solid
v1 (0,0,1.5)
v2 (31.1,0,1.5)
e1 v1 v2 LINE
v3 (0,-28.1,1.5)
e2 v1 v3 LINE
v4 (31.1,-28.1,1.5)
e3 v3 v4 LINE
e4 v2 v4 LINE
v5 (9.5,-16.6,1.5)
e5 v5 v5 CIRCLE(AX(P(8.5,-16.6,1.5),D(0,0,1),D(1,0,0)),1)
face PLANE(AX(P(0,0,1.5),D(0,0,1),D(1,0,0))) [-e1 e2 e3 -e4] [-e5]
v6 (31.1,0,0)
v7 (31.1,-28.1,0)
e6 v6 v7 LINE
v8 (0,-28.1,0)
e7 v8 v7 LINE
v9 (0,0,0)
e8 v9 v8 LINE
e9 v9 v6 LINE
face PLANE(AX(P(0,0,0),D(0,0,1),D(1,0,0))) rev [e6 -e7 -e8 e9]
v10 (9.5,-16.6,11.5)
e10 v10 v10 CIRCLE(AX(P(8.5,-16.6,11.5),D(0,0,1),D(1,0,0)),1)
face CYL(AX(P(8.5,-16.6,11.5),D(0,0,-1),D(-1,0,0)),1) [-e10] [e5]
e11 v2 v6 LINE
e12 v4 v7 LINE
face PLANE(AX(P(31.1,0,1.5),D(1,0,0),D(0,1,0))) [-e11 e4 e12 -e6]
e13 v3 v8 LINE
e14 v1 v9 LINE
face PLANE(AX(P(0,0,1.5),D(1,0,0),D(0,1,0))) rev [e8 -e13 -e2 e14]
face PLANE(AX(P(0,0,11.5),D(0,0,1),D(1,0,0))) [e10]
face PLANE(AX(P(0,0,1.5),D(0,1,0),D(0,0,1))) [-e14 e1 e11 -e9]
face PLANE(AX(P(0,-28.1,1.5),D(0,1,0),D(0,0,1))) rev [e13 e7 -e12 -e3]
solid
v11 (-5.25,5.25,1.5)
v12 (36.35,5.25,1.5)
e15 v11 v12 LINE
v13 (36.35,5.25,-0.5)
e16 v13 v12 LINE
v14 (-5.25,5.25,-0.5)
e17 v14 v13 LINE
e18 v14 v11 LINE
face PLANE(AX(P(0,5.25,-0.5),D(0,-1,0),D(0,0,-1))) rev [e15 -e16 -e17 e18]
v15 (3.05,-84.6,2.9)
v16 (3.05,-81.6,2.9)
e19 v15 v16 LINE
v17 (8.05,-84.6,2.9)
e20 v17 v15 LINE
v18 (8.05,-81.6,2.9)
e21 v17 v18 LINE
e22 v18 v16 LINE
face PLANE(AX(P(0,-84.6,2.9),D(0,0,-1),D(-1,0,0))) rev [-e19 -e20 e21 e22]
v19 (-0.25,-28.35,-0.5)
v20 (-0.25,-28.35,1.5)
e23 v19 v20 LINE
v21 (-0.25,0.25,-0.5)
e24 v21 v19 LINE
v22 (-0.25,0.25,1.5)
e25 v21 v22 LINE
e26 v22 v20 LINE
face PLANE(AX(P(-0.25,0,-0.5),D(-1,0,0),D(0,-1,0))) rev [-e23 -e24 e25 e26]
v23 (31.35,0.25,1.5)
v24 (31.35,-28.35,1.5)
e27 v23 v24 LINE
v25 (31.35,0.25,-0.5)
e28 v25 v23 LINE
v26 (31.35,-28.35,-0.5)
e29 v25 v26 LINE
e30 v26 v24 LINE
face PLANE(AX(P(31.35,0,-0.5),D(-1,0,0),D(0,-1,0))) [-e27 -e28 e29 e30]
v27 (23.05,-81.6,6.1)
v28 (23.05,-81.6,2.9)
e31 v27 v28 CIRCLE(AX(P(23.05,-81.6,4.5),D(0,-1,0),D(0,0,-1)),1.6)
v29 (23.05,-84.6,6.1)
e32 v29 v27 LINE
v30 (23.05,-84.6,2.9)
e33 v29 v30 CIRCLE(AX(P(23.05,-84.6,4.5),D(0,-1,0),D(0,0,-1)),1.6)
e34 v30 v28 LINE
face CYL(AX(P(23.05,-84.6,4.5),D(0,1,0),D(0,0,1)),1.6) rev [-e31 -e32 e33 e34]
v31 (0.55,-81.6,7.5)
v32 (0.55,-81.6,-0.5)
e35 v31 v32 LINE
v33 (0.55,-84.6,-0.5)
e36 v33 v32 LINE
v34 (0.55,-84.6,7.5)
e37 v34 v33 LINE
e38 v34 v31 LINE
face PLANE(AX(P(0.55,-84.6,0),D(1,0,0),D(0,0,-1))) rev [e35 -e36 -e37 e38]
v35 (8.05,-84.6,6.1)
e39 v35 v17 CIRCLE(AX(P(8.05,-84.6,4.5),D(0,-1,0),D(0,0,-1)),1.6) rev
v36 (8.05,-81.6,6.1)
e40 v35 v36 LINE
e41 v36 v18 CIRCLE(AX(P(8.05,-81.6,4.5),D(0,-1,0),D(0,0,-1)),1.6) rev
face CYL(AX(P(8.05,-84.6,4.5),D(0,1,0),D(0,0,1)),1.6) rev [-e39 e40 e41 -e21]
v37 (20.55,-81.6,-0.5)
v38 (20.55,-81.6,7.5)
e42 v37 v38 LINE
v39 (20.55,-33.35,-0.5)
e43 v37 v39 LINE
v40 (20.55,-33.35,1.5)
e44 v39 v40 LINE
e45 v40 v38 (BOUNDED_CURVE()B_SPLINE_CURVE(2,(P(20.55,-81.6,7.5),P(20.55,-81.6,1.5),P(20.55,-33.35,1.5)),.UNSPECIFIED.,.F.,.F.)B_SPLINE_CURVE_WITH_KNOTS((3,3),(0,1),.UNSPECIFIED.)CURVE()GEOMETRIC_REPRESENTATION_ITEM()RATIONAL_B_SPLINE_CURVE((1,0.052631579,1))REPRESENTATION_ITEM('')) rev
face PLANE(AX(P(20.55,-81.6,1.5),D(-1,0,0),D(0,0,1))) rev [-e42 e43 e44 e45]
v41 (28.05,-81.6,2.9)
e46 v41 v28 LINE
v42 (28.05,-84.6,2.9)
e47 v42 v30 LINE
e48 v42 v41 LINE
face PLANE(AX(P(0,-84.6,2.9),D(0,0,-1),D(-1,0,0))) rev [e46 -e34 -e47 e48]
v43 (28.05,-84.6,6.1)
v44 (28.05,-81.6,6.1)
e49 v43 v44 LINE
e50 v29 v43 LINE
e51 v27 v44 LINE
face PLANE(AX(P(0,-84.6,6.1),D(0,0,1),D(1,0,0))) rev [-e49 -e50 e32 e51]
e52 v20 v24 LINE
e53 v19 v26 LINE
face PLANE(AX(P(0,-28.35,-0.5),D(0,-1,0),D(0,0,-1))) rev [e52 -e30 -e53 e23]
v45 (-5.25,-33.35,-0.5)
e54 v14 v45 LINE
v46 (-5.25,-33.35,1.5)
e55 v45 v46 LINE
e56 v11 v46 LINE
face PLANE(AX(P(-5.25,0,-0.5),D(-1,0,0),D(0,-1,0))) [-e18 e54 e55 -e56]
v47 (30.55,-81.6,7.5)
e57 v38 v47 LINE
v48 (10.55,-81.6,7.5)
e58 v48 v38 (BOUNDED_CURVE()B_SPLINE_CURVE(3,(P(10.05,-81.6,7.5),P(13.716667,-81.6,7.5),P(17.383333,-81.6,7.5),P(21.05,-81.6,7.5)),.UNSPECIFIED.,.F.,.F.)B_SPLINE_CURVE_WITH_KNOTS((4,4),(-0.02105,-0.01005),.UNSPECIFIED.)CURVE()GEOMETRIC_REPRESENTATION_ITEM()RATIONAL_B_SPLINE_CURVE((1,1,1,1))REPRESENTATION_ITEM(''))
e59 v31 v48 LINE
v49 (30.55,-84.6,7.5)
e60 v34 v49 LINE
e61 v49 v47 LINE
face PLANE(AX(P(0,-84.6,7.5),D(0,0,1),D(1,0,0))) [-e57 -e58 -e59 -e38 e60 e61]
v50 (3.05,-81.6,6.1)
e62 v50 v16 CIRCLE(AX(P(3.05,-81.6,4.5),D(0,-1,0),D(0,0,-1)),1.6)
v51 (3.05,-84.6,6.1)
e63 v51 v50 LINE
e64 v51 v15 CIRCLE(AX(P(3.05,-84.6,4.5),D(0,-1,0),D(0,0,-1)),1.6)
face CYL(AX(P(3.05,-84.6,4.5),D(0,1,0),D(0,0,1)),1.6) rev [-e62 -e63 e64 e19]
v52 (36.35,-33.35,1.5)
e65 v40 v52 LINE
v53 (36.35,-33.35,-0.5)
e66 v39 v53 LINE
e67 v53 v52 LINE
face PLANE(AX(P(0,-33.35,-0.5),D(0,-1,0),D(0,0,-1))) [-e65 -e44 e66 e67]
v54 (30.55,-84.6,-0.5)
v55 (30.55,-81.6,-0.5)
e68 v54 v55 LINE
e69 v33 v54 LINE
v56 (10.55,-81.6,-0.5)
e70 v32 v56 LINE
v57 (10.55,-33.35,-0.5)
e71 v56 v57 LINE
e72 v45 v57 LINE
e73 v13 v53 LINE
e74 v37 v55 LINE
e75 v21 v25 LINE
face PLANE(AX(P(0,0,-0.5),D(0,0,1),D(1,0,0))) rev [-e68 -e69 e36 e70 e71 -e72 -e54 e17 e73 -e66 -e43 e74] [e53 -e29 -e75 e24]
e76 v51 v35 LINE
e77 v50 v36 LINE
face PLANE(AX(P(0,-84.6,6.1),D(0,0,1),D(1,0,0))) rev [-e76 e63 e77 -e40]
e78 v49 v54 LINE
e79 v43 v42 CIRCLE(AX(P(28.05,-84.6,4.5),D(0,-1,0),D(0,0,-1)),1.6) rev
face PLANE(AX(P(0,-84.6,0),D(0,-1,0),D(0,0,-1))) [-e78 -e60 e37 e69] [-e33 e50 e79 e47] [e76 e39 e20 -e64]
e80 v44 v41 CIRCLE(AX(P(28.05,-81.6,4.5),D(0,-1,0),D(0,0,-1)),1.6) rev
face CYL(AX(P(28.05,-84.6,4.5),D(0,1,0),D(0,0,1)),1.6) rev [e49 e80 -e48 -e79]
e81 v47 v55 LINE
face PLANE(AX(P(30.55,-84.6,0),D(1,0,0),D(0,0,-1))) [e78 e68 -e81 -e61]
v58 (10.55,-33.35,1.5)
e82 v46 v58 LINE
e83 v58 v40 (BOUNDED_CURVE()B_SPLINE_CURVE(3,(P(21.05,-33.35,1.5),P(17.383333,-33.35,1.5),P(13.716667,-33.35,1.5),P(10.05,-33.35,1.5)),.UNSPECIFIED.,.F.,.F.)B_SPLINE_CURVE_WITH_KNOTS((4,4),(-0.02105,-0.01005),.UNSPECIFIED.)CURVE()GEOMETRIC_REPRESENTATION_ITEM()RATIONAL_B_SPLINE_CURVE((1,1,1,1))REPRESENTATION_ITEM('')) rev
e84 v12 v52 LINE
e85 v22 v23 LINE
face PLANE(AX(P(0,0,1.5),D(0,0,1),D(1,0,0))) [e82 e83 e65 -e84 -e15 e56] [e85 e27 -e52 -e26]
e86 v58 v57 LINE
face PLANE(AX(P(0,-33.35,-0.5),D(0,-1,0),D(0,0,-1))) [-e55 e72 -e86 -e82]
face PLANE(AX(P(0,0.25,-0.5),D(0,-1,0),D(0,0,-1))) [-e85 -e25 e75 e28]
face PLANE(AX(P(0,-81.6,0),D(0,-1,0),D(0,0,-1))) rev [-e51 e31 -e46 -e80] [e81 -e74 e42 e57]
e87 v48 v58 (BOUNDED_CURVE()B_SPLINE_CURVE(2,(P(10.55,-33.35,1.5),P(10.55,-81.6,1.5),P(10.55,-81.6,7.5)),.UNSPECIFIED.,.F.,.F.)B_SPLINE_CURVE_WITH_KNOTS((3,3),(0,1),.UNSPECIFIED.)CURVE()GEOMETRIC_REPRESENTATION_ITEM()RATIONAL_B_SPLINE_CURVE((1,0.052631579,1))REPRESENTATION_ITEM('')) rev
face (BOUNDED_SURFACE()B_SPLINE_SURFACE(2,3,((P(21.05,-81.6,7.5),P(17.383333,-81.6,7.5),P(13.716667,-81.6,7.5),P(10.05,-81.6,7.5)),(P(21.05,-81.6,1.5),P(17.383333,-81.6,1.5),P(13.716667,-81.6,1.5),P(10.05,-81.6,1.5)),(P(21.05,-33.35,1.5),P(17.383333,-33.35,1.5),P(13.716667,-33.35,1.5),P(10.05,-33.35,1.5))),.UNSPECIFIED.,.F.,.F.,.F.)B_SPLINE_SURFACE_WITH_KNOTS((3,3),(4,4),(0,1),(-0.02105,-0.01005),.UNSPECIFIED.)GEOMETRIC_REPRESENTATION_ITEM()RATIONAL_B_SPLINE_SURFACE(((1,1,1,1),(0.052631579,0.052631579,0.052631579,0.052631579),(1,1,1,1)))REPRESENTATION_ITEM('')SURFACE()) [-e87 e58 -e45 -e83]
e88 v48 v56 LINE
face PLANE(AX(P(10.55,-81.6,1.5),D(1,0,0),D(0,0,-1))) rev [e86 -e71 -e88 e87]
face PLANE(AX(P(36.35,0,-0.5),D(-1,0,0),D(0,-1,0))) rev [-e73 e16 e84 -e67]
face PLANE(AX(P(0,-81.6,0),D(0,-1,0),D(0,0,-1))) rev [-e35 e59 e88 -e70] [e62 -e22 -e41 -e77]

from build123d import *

# Parameters (mm, degrees)
SKETCH1_W            = 31.1
SKETCH1_H            = 28.1
BOSS_EXTRUDE2_DEPTH  = 1.5
SKETCH3_R            = 1
BOSS_EXTRUDE3_DEPTH  = 10
SKETCH4_W            = 41.6
SKETCH4_H            = 38.6
SKETCH4_W_2          = 31.6
SKETCH4_H_2          = 28.6
BOSS_EXTRUDE4_DEPTH  = 2
SKETCH6_W            = 10
SKETCH6_H            = 2
BOSS_EXTRUDE5_DEPTH  = 48.25
SKETCH7_W            = 10
SKETCH7_H            = 3
SKETCH7_H_2          = 2
BOSS_EXTRUDE10_DEPTH = 3
FILLET5_START        = 10.55
FILLET5_DEPTH        = 10


with BuildPart() as part:
    # Sketch1 → Boss-Extrude2 (new body)
    with BuildSketch(Plane.XY):
        with Locations((15.55, -14.05)):
            Rectangle(SKETCH1_W, SKETCH1_H)
    extrude(amount=BOSS_EXTRUDE2_DEPTH)

    # Sketch3 → Boss-Extrude3 (add)
    with BuildSketch(Plane.XY.offset(1.5)):
        with Locations((8.5, -16.6)):
            Circle(SKETCH3_R)
    extrude(amount=BOSS_EXTRUDE3_DEPTH)


with BuildPart() as body_2:
    # Sketch4 → Boss-Extrude4 (new body)
    with BuildSketch(Plane.XY.offset(1.5)):
        with Locations((15.55, -14.05)):
            Rectangle(SKETCH4_W, SKETCH4_H)
        with Locations((15.55, -14.05)):
            Rectangle(SKETCH4_W_2, SKETCH4_H_2, mode=Mode.SUBTRACT)
    extrude(amount=-BOSS_EXTRUDE4_DEPTH)

    # Sketch6 → Boss-Extrude5 (add)
    with BuildSketch(Plane.XZ.offset(33.35)):
        with Locations((15.55, 0.5)):
            Rectangle(SKETCH6_W, SKETCH6_H)
    extrude(amount=BOSS_EXTRUDE5_DEPTH)

    # Sketch7 → Boss-Extrude10 (add)
    with BuildSketch(Plane.XZ.offset(81.6)):
        with BuildLine():
            Line((9.65, 4.5), (10.55, 4.5))
            Line((10.55, 4.5), (10.55, 7.5))
            Line((10.55, 7.5), (0.55, 7.5))
            Line((0.55, 7.5), (0.55, 4.5))
            Line((0.55, 4.5), (1.45, 4.5))
            ThreePointArc((1.45, 4.5), (1.91862917, 5.63137087), (3.050000057, 6.1))
            Line((3.050000057, 6.1), (8.05, 6.1))
            ThreePointArc((8.05, 6.1), (9.18137085, 5.63137085), (9.65, 4.5))
        make_face()
        with BuildLine():
            Line((0.55, 1.5), (10.55, 1.5))
            Line((10.55, 1.5), (10.55, 4.5))
            Line((10.55, 4.5), (9.65, 4.5))
            ThreePointArc((9.65, 4.5), (9.18137085, 3.36862915), (8.05, 2.9))
            Line((8.05, 2.9), (3.05, 2.9))
            ThreePointArc((3.05, 2.9), (1.91862915, 3.36862915), (1.45, 4.5))
            Line((1.45, 4.5), (0.55, 4.5))
            Line((0.55, 4.5), (0.55, 1.5))
        make_face()
        with Locations((15.55, 6)):
            Rectangle(SKETCH7_W, SKETCH7_H)
        with Locations((15.55, 3)):
            Rectangle(SKETCH7_W, SKETCH7_H)
        with BuildLine():
            Line((20.55, 4.5), (20.55, 1.5))
            Line((20.55, 1.5), (30.55, 1.5))
            Line((30.55, 1.5), (30.55, 4.5))
            Line((30.55, 4.5), (29.65, 4.5))
            ThreePointArc((29.65, 4.5), (29.18137085, 3.36862915), (28.05, 2.9))
            Line((28.05, 2.9), (23.05, 2.9))
            ThreePointArc((23.05, 2.9), (21.91862915, 3.36862915), (21.45, 4.5))
            Line((21.45, 4.5), (20.55, 4.5))
        make_face()
        with BuildLine():
            Line((20.55, 7.5), (20.55, 4.5))
            Line((20.55, 4.5), (21.45, 4.5))
            ThreePointArc((21.45, 4.5), (21.91862915, 5.63137085), (23.05, 6.1))
            Line((23.05, 6.1), (28.05, 6.1))
            ThreePointArc((28.05, 6.1), (29.18137085, 5.63137085), (29.65, 4.5))
            Line((29.65, 4.5), (30.55, 4.5))
            Line((30.55, 4.5), (30.55, 7.5))
            Line((30.55, 7.5), (20.55, 7.5))
        make_face()
        with Locations((25.55, 0.5)):
            Rectangle(SKETCH7_W, SKETCH7_H_2)
        with Locations((15.55, 0.5)):
            Rectangle(SKETCH7_W, SKETCH7_H_2)
        with Locations((5.55, 0.5)):
            Rectangle(SKETCH7_W, SKETCH7_H_2)
    extrude(amount=BOSS_EXTRUDE10_DEPTH)

    # Fillet5: read off the stored shape, not the designer's step
    # Fillet5 outline → Fillet5 (add)
    with BuildSketch(Plane.YZ.offset(FILLET5_START)):
        with BuildLine():
            add(Edge.make_bspline(
                [(-81.6, 7.5), (-81.6, 1.5), (-33.35, 1.5)],
                knots=[0, 0, 0, 1, 1, 1], degree=2, weights=[1, 0.052631579, 1]))
            Line((-81.6, 7.5), (-81.6, 1.5))
            Line((-81.6, 1.5), (-33.35, 1.5))
        make_face()
    extrude(amount=FILLET5_DEPTH)


solid = Compound([part.part, body_2.part])
